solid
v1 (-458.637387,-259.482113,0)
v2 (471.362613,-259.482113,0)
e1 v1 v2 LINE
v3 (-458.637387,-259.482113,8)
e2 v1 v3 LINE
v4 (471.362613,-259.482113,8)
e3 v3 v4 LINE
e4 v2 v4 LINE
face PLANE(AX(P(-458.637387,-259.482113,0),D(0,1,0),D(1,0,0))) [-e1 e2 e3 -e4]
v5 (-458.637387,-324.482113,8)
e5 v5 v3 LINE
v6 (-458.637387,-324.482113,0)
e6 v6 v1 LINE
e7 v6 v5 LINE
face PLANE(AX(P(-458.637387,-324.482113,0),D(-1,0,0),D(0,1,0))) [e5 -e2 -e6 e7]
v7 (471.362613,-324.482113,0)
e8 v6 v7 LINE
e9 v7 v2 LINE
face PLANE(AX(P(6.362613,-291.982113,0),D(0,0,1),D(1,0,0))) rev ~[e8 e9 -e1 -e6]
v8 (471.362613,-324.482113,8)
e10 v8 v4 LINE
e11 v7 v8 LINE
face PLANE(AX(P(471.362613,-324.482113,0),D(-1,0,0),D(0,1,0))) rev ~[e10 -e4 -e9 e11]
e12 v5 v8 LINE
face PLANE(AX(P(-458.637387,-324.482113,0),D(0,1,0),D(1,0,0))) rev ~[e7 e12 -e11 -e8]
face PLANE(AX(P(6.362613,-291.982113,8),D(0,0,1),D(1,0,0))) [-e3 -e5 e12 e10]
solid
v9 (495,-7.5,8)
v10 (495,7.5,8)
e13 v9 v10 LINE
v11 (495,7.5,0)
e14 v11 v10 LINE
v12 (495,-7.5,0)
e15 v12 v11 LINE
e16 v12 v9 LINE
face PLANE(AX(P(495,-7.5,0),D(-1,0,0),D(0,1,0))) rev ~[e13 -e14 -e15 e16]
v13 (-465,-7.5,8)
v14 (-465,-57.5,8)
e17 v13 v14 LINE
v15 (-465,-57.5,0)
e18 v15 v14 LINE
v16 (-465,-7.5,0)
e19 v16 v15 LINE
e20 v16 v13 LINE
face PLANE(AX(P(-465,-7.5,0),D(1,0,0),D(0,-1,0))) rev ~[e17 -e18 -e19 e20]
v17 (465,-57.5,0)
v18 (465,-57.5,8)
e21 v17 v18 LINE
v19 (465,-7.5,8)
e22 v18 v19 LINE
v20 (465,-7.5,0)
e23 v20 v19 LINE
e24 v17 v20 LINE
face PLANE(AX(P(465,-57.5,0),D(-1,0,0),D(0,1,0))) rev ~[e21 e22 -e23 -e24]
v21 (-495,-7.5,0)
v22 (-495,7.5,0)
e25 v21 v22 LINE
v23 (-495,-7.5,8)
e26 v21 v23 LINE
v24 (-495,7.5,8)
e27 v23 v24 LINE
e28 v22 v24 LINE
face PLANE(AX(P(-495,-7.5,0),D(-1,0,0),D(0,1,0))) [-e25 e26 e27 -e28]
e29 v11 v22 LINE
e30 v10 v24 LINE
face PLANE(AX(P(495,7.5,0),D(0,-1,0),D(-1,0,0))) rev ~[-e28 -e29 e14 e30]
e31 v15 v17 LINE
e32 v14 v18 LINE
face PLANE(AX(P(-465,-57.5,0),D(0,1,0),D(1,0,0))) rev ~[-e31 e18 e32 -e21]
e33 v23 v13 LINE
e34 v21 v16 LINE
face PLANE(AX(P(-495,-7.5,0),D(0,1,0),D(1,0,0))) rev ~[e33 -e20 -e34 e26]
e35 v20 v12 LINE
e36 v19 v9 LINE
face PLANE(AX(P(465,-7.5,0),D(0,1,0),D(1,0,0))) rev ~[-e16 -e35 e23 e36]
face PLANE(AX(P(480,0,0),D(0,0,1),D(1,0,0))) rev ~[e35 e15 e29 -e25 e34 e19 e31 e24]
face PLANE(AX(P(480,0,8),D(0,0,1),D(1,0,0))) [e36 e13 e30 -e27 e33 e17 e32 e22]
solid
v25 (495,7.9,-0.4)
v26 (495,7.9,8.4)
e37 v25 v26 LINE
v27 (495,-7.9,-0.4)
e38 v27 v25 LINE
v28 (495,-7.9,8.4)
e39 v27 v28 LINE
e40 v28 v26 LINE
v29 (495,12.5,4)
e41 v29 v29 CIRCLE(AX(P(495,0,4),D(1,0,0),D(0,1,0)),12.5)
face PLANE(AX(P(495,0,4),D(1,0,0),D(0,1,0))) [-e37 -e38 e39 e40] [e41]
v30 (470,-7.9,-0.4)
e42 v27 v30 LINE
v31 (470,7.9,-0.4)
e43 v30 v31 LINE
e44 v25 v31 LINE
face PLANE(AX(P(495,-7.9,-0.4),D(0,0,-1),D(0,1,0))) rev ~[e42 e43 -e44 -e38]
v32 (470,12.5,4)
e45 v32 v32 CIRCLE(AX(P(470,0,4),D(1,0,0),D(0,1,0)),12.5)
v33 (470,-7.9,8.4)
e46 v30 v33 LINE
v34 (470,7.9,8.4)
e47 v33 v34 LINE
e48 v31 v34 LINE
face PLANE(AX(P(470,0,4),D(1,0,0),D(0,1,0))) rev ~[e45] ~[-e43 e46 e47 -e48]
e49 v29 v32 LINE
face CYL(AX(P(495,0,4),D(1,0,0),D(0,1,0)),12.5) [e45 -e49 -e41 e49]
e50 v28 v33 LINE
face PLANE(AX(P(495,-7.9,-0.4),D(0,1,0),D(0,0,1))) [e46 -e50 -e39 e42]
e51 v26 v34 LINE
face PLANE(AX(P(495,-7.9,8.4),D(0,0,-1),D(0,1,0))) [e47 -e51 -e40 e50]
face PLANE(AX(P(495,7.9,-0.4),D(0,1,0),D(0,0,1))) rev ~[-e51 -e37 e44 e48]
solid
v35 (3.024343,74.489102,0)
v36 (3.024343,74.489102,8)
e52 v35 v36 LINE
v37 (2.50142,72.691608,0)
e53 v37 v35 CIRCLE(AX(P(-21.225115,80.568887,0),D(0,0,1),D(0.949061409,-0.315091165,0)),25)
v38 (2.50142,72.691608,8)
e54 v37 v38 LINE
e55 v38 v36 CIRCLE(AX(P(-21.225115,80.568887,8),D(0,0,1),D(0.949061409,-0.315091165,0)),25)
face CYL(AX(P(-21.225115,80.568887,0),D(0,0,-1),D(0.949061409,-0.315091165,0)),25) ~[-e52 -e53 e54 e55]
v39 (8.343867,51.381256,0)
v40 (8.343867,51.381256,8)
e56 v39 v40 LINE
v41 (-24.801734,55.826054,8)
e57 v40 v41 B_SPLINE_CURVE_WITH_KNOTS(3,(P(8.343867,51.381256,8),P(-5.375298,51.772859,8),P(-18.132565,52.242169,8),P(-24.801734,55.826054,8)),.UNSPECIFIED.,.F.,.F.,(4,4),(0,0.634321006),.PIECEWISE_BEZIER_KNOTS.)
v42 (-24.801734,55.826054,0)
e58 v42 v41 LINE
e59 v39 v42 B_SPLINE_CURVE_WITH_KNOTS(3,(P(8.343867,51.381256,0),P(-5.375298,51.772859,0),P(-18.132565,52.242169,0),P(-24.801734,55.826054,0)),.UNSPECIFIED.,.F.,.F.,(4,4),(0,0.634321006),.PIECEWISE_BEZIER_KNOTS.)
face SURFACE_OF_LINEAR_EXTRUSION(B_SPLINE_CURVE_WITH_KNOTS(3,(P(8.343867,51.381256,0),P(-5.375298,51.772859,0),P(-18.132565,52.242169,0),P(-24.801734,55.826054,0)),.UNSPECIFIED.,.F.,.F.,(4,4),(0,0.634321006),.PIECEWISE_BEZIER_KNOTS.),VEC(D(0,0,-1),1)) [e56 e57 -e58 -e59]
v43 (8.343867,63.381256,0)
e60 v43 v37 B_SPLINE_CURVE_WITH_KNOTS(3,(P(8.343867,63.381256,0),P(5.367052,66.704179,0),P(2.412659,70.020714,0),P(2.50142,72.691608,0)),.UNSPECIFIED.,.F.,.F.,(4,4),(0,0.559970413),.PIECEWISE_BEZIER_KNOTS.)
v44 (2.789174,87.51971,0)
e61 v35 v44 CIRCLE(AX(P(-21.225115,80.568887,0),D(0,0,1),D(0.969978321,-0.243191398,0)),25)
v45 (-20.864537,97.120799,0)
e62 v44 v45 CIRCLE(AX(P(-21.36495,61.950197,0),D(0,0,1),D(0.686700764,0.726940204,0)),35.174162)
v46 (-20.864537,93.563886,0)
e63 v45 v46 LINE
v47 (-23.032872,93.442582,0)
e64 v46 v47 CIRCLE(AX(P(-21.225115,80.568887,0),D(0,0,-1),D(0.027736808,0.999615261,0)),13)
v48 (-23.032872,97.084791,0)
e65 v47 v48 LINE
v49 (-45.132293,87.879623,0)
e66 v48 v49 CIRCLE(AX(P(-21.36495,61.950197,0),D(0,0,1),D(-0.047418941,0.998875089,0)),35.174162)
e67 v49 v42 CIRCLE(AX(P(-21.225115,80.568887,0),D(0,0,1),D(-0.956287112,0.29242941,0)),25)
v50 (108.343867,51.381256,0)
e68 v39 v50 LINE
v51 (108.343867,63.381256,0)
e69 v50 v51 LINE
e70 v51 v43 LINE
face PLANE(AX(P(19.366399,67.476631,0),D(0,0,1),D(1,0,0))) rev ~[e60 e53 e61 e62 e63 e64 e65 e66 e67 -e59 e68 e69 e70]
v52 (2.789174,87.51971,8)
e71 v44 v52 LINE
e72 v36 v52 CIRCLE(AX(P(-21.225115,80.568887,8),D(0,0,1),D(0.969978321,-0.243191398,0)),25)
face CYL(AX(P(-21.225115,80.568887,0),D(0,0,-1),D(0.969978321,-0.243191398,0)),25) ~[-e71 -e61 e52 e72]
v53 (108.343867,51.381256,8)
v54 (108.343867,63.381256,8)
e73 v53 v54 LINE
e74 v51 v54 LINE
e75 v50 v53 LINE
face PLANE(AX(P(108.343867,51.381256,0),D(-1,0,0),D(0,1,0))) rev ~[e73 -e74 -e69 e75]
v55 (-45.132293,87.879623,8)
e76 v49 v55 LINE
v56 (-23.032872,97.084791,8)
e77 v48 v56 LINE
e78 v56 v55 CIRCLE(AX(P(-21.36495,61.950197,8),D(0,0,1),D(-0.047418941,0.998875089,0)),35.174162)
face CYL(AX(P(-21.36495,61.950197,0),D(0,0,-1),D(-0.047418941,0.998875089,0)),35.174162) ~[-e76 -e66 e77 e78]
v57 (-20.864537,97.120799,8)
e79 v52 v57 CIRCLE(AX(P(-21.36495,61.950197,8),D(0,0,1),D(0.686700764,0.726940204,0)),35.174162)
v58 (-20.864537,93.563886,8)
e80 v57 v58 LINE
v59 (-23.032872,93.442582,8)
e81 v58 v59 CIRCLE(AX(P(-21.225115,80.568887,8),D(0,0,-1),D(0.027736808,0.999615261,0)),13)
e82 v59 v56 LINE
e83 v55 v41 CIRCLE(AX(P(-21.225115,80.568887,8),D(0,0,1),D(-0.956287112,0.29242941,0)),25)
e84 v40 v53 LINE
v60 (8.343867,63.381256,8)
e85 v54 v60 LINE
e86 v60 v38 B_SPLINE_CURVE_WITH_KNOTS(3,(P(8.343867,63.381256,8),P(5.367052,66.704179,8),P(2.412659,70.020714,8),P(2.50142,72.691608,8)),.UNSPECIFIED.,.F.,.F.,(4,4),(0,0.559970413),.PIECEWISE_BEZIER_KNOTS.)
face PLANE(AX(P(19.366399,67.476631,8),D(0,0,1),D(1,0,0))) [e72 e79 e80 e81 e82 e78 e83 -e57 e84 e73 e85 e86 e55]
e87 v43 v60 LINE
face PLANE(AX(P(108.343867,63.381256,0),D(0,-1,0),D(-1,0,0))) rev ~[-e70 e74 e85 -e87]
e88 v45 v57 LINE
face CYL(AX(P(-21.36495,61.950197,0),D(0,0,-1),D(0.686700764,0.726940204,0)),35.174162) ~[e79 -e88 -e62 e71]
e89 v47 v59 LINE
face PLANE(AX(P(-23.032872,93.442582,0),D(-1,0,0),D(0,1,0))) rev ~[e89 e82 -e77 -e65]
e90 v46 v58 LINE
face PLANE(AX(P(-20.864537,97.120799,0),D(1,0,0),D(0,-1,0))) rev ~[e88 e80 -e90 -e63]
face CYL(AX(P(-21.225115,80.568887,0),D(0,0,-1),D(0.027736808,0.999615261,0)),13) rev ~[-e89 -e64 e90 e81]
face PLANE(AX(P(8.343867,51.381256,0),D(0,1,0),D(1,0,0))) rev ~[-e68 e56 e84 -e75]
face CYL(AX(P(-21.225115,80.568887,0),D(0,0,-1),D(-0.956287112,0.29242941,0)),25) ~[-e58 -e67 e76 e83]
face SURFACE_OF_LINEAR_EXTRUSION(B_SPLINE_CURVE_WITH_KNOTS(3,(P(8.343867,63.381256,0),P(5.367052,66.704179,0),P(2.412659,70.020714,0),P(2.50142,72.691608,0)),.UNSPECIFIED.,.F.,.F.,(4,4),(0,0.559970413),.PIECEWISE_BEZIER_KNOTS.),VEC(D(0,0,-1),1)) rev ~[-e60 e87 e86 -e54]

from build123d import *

# Parameters (mm, degrees)
F0_W     = 30
F0_H     = 15
F1_DEPTH = 8
F0_W_2   = 930
F0_H_2   = 65
F2_R     = 12.5
F2_W     = 15.8
F2_H     = 8.8
F3_DEPTH = 25
F5_DEPTH = 8


with BuildPart() as f1:
    # F0 (on Top) → F1 (new body)
    with BuildSketch(Plane.XY):
        with Locations((480, 0)):
            Rectangle(F0_W, F0_H)
        Polygon((465, -7.5), (465, 7.5), (-465, 7.5), (-465, -7.5), (-465, -57.5), (465, -57.5), align=None)
        with Locations((-480, 0)):
            Rectangle(F0_W, F0_H)
    extrude(amount=F1_DEPTH)


with BuildPart() as f1b:
    # F0 (on Top) → F1, piece 2 (new body)
    with BuildSketch(Plane.XY):
        with Locations((6.3626134396, -291.9821131229)):
            Rectangle(F0_W_2, F0_H_2)
    extrude(amount=F1_DEPTH)


with BuildPart() as f3:
    # F2 (on face) → F3 (new body)
    with BuildSketch(Plane.YZ.offset(495)):
        with Locations((0, 4)):
            Circle(F2_R)
        with Locations((0, 4)):
            Rectangle(F2_W, F2_H, mode=Mode.SUBTRACT)
    extrude(amount=-F3_DEPTH)


with BuildPart() as f5:
    # F4 (on Top) → F5 (new body)
    with BuildSketch(Plane.XY):
        with BuildLine():
            Line((108.3438670263, 51.3812564313), (108.3438670263, 63.3812564313))
            Line((108.3438670263, 63.3812564313), (8.3438670263, 63.3812564313))
            add(Edge.make_bspline(
                [(8.3438670263, 63.3812564313), (5.3670516377, 66.7041790393), (2.4126594236, 70.0207141177), (2.5014199346, 72.6916081624)],
                knots=[0, 0, 0, 0, 0.5599704127, 0.5599704127, 0.5599704127, 0.5599704127], degree=3))
            add(Edge.make_bspline(
                [(2.5014199346, 72.6916081624), (2.5224130391, 73.3233120261), (2.7136366909, 73.9188994552), (3.0243427489, 74.4891023385)],
                knots=[0.5599704127, 0.5599704127, 0.5599704127, 0.5599704127, 0.6924112611, 0.6924112611, 0.6924112611, 0.6924112611], degree=3))
            ThreePointArc((3.0243427489, 74.4891023385), (3.7708143316, 81.0199999582), (2.7891735817, 87.5197095656))
            ThreePointArc((2.7891735817, 87.5197095656), (-8.1359373234, 94.5418353751), (-20.8645367822, 97.1207993121))
            Line((-20.8645367822, 97.1207993121), (-20.8645367822, 93.5638856829))
            ThreePointArc((-20.8645367822, 93.5638856829), (-20.4989886716, 67.5891823606), (-23.0328720233, 93.4425820067))
            Line((-23.0328720233, 93.4425820067), (-23.0328720233, 97.0847913286))
            ThreePointArc((-23.0328720233, 97.0847913286), (-34.8898145719, 94.420179027), (-45.1322930826, 87.8796225313))
            ThreePointArc((-45.1322930826, 87.8796225313), (-42.3366661495, 67.1785019342), (-24.8017338771, 55.8260539988))
            add(Edge.make_bspline(
                [(8.3438670263, 51.3812564313), (-5.3752977401, 51.7728589475), (-18.1325646639, 52.2421691312), (-24.8017338771, 55.8260539988)],
                knots=[0, 0, 0, 0, 0.6343210063, 0.6343210063, 0.6343210063, 0.6343210063], degree=3))
            Line((8.3438670263, 51.3812564313), (108.3438670263, 51.3812564313))
        make_face()
        with BuildLine():
            add(Edge.make_bspline(
                [(2.5014199346, 72.6916081624), (2.5224130391, 73.3233120261), (2.7136366909, 73.9188994552), (3.0243427489, 74.4891023385)],
                knots=[0.5599704127, 0.5599704127, 0.5599704127, 0.5599704127, 0.6924112611, 0.6924112611, 0.6924112611, 0.6924112611], degree=3))
            ThreePointArc((2.5014199346, 72.6916081624), (2.7797119065, 73.5854589418), (3.0243427489, 74.4891023385))
        make_face()
    extrude(amount=F5_DEPTH)


solid = Compound([f1.part, f1b.part, f3.part, f5.part])
